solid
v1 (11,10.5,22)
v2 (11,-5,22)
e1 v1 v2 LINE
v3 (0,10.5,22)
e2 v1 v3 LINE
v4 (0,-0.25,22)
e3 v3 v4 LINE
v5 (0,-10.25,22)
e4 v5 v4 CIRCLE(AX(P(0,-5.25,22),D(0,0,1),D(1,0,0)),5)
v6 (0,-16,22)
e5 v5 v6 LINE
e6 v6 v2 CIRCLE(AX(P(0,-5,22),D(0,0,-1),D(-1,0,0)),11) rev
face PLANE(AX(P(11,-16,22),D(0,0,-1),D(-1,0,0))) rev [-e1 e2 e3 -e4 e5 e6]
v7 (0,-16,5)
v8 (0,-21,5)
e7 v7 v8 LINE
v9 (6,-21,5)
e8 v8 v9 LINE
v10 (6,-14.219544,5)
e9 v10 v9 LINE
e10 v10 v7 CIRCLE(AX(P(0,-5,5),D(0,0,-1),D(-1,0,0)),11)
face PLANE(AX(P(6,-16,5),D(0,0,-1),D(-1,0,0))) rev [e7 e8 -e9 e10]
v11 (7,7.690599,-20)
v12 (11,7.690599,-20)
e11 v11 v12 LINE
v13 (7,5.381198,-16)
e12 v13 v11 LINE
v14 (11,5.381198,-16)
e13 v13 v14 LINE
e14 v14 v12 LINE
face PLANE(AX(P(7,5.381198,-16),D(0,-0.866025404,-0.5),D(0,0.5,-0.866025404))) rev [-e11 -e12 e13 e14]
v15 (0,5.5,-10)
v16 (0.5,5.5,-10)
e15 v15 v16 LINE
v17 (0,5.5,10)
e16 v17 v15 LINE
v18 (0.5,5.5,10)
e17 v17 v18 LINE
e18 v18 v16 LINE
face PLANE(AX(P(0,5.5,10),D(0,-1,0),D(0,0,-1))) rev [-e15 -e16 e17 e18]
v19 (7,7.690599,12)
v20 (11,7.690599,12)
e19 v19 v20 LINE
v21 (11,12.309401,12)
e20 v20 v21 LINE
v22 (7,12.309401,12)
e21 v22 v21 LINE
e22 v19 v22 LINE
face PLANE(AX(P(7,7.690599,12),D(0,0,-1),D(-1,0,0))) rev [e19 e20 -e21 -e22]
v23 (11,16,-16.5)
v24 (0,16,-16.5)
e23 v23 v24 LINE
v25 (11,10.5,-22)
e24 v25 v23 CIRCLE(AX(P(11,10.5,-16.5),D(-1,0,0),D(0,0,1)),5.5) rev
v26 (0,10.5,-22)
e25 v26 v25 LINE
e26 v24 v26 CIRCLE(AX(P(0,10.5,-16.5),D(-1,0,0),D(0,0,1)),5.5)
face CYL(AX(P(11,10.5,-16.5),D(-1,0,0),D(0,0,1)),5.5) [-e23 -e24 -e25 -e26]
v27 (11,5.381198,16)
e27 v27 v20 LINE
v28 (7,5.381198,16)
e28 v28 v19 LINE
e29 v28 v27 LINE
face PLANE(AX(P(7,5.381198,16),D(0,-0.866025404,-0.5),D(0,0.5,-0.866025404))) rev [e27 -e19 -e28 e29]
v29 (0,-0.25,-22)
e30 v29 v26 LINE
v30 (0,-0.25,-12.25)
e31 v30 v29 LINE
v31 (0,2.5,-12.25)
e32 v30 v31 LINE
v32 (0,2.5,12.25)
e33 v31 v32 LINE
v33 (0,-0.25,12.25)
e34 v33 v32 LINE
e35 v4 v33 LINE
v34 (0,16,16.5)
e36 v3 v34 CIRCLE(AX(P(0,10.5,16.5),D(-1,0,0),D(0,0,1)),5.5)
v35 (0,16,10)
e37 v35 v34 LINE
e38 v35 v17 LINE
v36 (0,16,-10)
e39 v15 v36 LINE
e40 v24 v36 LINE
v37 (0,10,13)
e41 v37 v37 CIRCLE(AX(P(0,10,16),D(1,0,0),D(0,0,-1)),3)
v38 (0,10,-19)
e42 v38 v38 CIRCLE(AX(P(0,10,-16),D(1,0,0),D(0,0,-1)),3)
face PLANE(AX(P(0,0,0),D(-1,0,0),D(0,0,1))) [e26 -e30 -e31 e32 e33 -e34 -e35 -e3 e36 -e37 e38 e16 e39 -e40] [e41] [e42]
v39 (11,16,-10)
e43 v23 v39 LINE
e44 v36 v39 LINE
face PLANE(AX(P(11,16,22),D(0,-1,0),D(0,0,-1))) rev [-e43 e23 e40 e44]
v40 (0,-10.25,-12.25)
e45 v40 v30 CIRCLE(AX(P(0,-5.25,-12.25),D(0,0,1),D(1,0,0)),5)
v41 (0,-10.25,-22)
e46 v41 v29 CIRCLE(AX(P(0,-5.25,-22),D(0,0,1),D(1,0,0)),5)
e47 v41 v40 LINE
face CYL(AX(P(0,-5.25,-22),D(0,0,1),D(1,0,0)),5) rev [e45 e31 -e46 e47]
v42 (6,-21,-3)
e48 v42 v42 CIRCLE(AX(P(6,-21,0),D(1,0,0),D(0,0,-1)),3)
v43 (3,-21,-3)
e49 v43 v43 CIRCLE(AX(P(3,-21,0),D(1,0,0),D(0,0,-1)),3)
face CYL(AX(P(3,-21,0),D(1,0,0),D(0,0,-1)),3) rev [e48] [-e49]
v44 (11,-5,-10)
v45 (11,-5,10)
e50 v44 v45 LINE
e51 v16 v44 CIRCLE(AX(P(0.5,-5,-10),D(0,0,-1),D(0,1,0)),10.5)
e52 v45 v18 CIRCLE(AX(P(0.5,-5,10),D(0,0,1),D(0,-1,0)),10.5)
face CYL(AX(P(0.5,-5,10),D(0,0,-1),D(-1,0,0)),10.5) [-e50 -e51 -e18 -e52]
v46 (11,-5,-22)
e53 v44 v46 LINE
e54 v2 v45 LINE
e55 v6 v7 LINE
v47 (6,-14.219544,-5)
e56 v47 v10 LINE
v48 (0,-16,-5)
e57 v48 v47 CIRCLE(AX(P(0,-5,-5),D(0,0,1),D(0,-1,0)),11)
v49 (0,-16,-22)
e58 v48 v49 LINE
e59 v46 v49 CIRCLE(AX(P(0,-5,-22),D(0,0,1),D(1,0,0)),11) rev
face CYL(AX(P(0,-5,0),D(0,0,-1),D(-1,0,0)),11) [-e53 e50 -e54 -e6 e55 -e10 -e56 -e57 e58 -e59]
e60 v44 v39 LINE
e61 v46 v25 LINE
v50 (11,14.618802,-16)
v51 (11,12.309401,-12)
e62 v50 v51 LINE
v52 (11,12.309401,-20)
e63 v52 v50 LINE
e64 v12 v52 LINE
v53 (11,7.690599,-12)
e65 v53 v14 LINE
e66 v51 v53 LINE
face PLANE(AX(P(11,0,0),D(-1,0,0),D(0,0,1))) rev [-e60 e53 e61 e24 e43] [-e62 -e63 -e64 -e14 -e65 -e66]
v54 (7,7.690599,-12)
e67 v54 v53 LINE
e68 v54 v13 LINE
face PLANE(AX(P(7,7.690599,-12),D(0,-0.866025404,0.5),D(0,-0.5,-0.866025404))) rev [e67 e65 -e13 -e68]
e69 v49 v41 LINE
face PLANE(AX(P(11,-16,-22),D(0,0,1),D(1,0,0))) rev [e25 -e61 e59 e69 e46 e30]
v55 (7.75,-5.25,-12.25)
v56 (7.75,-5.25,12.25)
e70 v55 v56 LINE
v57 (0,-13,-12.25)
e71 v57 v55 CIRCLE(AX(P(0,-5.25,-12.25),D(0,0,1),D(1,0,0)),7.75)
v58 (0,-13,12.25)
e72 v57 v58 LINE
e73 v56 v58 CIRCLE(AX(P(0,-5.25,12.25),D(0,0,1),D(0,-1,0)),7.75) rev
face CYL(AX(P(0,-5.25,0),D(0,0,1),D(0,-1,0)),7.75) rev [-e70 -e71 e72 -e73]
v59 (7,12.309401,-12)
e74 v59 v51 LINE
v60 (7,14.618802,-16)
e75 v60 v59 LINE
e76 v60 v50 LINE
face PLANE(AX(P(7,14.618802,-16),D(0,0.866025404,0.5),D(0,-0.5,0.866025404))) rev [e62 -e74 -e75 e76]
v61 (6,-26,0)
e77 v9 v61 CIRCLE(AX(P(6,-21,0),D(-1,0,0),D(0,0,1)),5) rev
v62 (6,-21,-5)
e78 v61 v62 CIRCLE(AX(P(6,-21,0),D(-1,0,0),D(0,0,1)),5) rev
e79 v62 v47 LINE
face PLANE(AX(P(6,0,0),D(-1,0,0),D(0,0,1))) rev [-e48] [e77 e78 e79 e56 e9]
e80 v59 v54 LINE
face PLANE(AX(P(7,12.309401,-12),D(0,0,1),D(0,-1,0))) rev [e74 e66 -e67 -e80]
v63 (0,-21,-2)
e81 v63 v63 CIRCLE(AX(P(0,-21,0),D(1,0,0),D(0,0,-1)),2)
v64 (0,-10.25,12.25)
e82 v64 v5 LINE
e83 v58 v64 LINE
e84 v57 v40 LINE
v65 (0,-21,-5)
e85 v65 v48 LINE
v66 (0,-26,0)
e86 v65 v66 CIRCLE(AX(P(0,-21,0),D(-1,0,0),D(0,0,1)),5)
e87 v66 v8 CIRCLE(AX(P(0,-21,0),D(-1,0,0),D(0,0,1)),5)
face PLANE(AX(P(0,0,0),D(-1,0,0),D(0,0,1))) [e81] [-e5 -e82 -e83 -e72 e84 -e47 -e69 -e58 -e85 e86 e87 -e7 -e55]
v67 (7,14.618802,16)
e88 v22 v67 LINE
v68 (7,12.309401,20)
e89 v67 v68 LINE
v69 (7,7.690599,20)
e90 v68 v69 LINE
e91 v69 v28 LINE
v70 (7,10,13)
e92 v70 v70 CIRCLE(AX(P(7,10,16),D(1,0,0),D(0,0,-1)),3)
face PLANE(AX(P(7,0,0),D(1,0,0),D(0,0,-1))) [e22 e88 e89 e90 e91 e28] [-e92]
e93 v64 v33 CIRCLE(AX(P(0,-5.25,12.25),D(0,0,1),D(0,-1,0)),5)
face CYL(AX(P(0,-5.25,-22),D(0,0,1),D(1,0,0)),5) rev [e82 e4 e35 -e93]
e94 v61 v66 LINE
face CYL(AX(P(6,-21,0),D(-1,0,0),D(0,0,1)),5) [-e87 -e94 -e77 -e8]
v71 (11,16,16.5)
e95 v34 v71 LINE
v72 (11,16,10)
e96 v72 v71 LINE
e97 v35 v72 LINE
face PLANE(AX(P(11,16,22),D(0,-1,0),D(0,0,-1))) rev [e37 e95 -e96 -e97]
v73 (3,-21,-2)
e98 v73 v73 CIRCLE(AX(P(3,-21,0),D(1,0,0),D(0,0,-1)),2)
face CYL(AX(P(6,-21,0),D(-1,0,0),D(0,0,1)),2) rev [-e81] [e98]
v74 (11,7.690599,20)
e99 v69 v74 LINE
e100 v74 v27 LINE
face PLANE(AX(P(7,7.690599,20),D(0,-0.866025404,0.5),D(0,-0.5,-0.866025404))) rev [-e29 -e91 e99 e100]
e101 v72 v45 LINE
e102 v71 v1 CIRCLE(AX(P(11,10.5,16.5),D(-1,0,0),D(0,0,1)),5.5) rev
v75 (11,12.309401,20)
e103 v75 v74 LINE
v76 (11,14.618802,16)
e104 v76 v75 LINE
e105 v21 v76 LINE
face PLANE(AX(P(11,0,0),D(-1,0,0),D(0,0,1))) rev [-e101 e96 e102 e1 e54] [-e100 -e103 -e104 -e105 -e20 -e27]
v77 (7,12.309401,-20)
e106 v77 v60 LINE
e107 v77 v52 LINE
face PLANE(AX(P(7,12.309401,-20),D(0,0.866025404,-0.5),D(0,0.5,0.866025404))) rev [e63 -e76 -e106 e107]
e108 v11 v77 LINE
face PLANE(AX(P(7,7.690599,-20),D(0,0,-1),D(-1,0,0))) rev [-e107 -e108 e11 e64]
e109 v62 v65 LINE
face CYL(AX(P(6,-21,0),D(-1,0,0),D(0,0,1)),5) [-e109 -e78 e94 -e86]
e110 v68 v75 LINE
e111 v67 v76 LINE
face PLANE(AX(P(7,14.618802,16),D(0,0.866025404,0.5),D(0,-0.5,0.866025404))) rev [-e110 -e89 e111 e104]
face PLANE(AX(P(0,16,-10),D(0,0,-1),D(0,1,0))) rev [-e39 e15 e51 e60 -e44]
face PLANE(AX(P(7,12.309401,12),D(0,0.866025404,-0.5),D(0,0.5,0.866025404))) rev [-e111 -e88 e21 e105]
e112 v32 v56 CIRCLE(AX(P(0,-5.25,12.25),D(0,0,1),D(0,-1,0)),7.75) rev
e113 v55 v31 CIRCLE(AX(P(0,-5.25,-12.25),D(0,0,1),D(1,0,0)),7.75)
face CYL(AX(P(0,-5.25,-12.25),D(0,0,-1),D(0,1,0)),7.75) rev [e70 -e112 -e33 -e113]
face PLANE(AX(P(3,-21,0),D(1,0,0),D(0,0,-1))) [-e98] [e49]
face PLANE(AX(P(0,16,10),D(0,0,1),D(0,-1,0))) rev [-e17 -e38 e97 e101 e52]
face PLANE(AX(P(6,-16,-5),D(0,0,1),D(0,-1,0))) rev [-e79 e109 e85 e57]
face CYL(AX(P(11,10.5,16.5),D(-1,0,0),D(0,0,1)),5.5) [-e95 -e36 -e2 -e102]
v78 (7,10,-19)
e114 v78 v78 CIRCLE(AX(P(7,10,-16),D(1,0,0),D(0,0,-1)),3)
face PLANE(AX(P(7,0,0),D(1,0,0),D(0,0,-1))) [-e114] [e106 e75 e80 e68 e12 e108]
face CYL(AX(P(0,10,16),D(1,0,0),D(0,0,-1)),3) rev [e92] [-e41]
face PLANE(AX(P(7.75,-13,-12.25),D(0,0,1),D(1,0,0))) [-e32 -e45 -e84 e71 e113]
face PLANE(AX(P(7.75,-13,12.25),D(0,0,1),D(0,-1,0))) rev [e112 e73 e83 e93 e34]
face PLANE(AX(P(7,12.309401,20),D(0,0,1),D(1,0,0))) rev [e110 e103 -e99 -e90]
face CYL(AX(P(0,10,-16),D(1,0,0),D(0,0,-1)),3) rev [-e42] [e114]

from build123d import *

# Parameters (mm, degrees)
SKETCH1_W               = 44
SKETCH1_H               = 32
BOSS_EXTRUDE1_DEPTH     = 11
SKETCH2_W               = 24.5
SKETCH2_H               = 15.5
CUT_EXTRUDE1_DEPTH      = 7.75
FILLET1_R               = 7.75
CUT_EXTRUDE2_DEPTH      = 40.370833113
CUT_EXTRUDE2_DEPTH_BACK = 40.370833113
SKETCH4_R               = 3
SKETCH4_W               = 20
SKETCH4_H               = 10.5
CUT_EXTRUDE3_DEPTH      = 30.342801502
FILLET4_R               = 5.5
SKETCH7_W               = 10
SKETCH7_H               = 10
SKETCH7_R               = 2
BOSS_EXTRUDE5_DEPTH     = 6
FILLET5_R               = 5
CUT_EXTRUDE7_START      = -3
SKETCH9_R               = 3
SKETCH9_R_2             = 2
CUT_EXTRUDE7_DEPTH      = 3
SKETCH10_R              = 3
CUT_EXTRUDE8_DEPTH      = 4
FILLET7_R               = 10.5
FILLET8_R               = 11


# Some blends are built 0.0001 mm under size
with BuildPart() as part:
    # Sketch1 → Boss-Extrude1 (new body)
    with BuildSketch(Plane(origin=(0, 0, 0), x_dir=(0, 0, -1), z_dir=(1, 0, 0))):
        Rectangle(SKETCH1_W, SKETCH1_H)
    extrude(amount=BOSS_EXTRUDE1_DEPTH)

    # Sketch2 → Cut-Extrude1 (cut)
    with BuildSketch(Plane(origin=(0, 0, 0), x_dir=(0, 0, -1), z_dir=(1, 0, 0))):
        with Locations((0, -5.25)):
            Rectangle(SKETCH2_W, SKETCH2_H)
    extrude(amount=CUT_EXTRUDE1_DEPTH, mode=Mode.SUBTRACT)

    # Fillet1
    fillet1_edges = [part.edges().sort_by_distance(p)[0] for p in [
        (7.75, 2.5, 0),
        (7.75, -13, 0),
    ]]
    fillet(fillet1_edges, radius=FILLET1_R - 0.0001)  # a hair under: the kernel refuses the full size

    # Sketch3 → Cut-Extrude2 (cut, two sides: drawn at the far end of the back side and taken through both)
    with BuildSketch(Plane.XY.offset(-12.25).offset(-CUT_EXTRUDE2_DEPTH_BACK)):
        with BuildLine():
            ThreePointArc((0, -10.25), (3.535533906, -8.785533906), (5, -5.25))
            ThreePointArc((5, -5.25), (3.535533906, -1.714466094), (0, -0.25))
            Line((0, -0.25), (0, -10.25))
        make_face()
        with BuildLine():
            Line((0, -10.25), (0, -0.25))
            ThreePointArc((0, -0.25), (-5, -5.25), (0, -10.25))
        make_face()
    extrude(amount=CUT_EXTRUDE2_DEPTH + CUT_EXTRUDE2_DEPTH_BACK, mode=Mode.SUBTRACT)

    # Sketch4 → Cut-Extrude3 (cut, through all)
    with BuildSketch(Plane(origin=(11, 0, 0), x_dir=(0, 0, -1), z_dir=(1, 0, 0))):
        with Locations((-16, 10)):
            Circle(SKETCH4_R)
        with Locations((16, 10)):
            Circle(SKETCH4_R)
        with Locations((0, 10.75)):
            Rectangle(SKETCH4_W, SKETCH4_H)
    extrude(amount=-CUT_EXTRUDE3_DEPTH, mode=Mode.SUBTRACT)

    # Fillet4
    fillet4_edges = [part.edges().sort_by_distance(p)[0] for p in [
        (5.5, 16, 22),
        (5.5, 16, -22),
    ]]
    fillet(fillet4_edges, radius=FILLET4_R)

    # Sketch7 → Boss-Extrude5 (add)
    with BuildSketch(Plane(origin=(0, 0, 0), x_dir=(0, 0, -1), z_dir=(1, 0, 0))):
        with Locations((0, -21)):
            Rectangle(SKETCH7_W, SKETCH7_H)
        with Locations((0, -21)):
            Circle(SKETCH7_R, mode=Mode.SUBTRACT)
    extrude(amount=BOSS_EXTRUDE5_DEPTH)

    # Fillet5
    fillet5_edges = [part.edges().sort_by_distance(p)[0] for p in [
        (3, -26, -5),
        (3, -26, 5),
    ]]
    fillet(fillet5_edges, radius=FILLET5_R - 0.0001)  # a hair under: the kernel refuses the full size

    # Sketch9 → Cut-Extrude7 (cut)
    with BuildSketch(Plane(origin=(6, 0, 0), x_dir=(0, 0, -1), z_dir=(1, 0, 0)).offset(CUT_EXTRUDE7_START)):
        with Locations((0, -21)):
            Circle(SKETCH9_R)
        with Locations((0, -21)):
            Circle(SKETCH9_R_2, mode=Mode.SUBTRACT)
    extrude(amount=CUT_EXTRUDE7_DEPTH, mode=Mode.SUBTRACT)

    # Sketch10 → Cut-Extrude8 (cut)
    # profile 1 of 2: a face of its own
    with BuildSketch(Plane(origin=(11, 0, 0), x_dir=(0, 0, -1), z_dir=(1, 0, 0))):
        Polygon((-16, 5.381197846), (-12, 7.690598923), (-12, 12.309401077), (-16, 14.618802154), (-20, 12.309401077), (-20, 7.690598923), align=None)
        with Locations((-16, 10)):
            Circle(SKETCH10_R, mode=Mode.SUBTRACT)
    # profile 2 of 2: a face of its own
    with BuildSketch(Plane(origin=(11, 0, 0), x_dir=(0, 0, -1), z_dir=(1, 0, 0))):
        Polygon((16, 5.381197846), (20, 7.690598923), (20, 12.309401077), (16, 14.618802154), (12, 12.309401077), (12, 7.690598923), align=None)
        with Locations((16, 10)):
            Circle(SKETCH10_R, mode=Mode.SUBTRACT)
    extrude(amount=-CUT_EXTRUDE8_DEPTH, mode=Mode.SUBTRACT)

    # Fillet7
    fillet7_edges = [part.edges().sort_by_distance(p)[0] for p in [
        (11, 5.5, 0),
    ]]
    fillet(fillet7_edges, radius=FILLET7_R)

    # Fillet8
    # the kernel refuses this fillet: 11 mm, written as the material it takes off along each edge
    with BuildSketch(Plane(origin=(11, -16, 49.5), x_dir=(0, 1, 0), z_dir=(0, 0, -1))) as fillet8_piece_1_section:
        with BuildLine():
            CenterArc((FILLET8_R, -FILLET8_R), FILLET8_R, 90, 90)
            Line((0, -FILLET8_R), (0, 0))
            Line((0, 0), (FILLET8_R, 0))
        make_face()
    fillet8_piece_1 = extrude(amount=99, mode=Mode.PRIVATE)
    fillet8_piece_1 = split(fillet8_piece_1, bisect_by=Plane(origin=(6, -13.119412113, 27.25), z_dir=(1, 0, 0)), keep=Keep.TOP, mode=Mode.PRIVATE)
    fillet8_piece_1 = split(fillet8_piece_1, bisect_by=Plane(origin=(9.313036117, -13.119412113, 5), z_dir=(0, 0, 1)), keep=Keep.TOP, mode=Mode.PRIVATE)
    add(fillet8_piece_1, mode=Mode.SUBTRACT)
    with BuildSketch(Plane(origin=(11, -16, 49.5), x_dir=(0, 1, 0), z_dir=(0, 0, -1))) as fillet8_piece_2_section:
        with BuildLine():
            CenterArc((FILLET8_R, -FILLET8_R), FILLET8_R, 90, 90)
            Line((0, -FILLET8_R), (0, 0))
            Line((0, 0), (FILLET8_R, 0))
        make_face()
    fillet8_piece_2 = extrude(amount=99, mode=Mode.PRIVATE)
    fillet8_piece_2 = split(fillet8_piece_2, bisect_by=Plane(origin=(6, -15.650616863, 27.25), z_dir=(-1, 0, 0)), keep=Keep.TOP, mode=Mode.PRIVATE)
    fillet8_piece_2 = split(fillet8_piece_2, bisect_by=Plane(origin=(4.102097244, -15.650616863, 5), z_dir=(0, 0, 1)), keep=Keep.TOP, mode=Mode.PRIVATE)
    add(fillet8_piece_2, mode=Mode.SUBTRACT)
    with BuildSketch(Plane(origin=(11, -16, 49.5), x_dir=(0, 1, 0), z_dir=(0, 0, -1))) as fillet8_piece_3_section:
        with BuildLine():
            CenterArc((FILLET8_R, -FILLET8_R), FILLET8_R, 90, 90)
            Line((0, -FILLET8_R), (0, 0))
            Line((0, 0), (FILLET8_R, 0))
        make_face()
    fillet8_piece_3 = extrude(amount=99, mode=Mode.PRIVATE)
    fillet8_piece_3 = split(fillet8_piece_3, bisect_by=Plane(origin=(6, -13.119412113, 0), z_dir=(1, 0, 0)), keep=Keep.TOP, mode=Mode.PRIVATE)
    fillet8_piece_3 = split(fillet8_piece_3, bisect_by=Plane(origin=(9.313036117, -13.119412113, -5), z_dir=(0, 0, 1)), keep=Keep.TOP, mode=Mode.PRIVATE)
    fillet8_piece_3 = split(fillet8_piece_3, bisect_by=Plane(origin=(9.313036117, -13.119412113, 5), z_dir=(0, 0, -1)), keep=Keep.TOP, mode=Mode.PRIVATE)
    add(fillet8_piece_3, mode=Mode.SUBTRACT)
    with BuildSketch(Plane(origin=(11, -16, 49.5), x_dir=(0, 1, 0), z_dir=(0, 0, -1))) as fillet8_piece_4_section:
        with BuildLine():
            CenterArc((FILLET8_R, -FILLET8_R), FILLET8_R, 90, 90)
            Line((0, -FILLET8_R), (0, 0))
            Line((0, 0), (FILLET8_R, 0))
        make_face()
    fillet8_piece_4 = extrude(amount=99, mode=Mode.PRIVATE)
    fillet8_piece_4 = split(fillet8_piece_4, bisect_by=Plane(origin=(6, -13.119412113, -27.25), z_dir=(1, 0, 0)), keep=Keep.TOP, mode=Mode.PRIVATE)
    fillet8_piece_4 = split(fillet8_piece_4, bisect_by=Plane(origin=(9.313036117, -13.119412113, -5), z_dir=(0, 0, -1)), keep=Keep.TOP, mode=Mode.PRIVATE)
    add(fillet8_piece_4, mode=Mode.SUBTRACT)
    with BuildSketch(Plane(origin=(11, -16, 49.5), x_dir=(0, 1, 0), z_dir=(0, 0, -1))) as fillet8_piece_5_section:
        with BuildLine():
            CenterArc((FILLET8_R, -FILLET8_R), FILLET8_R, 90, 90)
            Line((0, -FILLET8_R), (0, 0))
            Line((0, 0), (FILLET8_R, 0))
        make_face()
    fillet8_piece_5 = extrude(amount=99, mode=Mode.PRIVATE)
    fillet8_piece_5 = split(fillet8_piece_5, bisect_by=Plane(origin=(6, -15.650616863, -27.25), z_dir=(-1, 0, 0)), keep=Keep.TOP, mode=Mode.PRIVATE)
    fillet8_piece_5 = split(fillet8_piece_5, bisect_by=Plane(origin=(4.102097244, -15.650616863, -5), z_dir=(0, 0, -1)), keep=Keep.TOP, mode=Mode.PRIVATE)
    add(fillet8_piece_5, mode=Mode.SUBTRACT)


solid = part.part
